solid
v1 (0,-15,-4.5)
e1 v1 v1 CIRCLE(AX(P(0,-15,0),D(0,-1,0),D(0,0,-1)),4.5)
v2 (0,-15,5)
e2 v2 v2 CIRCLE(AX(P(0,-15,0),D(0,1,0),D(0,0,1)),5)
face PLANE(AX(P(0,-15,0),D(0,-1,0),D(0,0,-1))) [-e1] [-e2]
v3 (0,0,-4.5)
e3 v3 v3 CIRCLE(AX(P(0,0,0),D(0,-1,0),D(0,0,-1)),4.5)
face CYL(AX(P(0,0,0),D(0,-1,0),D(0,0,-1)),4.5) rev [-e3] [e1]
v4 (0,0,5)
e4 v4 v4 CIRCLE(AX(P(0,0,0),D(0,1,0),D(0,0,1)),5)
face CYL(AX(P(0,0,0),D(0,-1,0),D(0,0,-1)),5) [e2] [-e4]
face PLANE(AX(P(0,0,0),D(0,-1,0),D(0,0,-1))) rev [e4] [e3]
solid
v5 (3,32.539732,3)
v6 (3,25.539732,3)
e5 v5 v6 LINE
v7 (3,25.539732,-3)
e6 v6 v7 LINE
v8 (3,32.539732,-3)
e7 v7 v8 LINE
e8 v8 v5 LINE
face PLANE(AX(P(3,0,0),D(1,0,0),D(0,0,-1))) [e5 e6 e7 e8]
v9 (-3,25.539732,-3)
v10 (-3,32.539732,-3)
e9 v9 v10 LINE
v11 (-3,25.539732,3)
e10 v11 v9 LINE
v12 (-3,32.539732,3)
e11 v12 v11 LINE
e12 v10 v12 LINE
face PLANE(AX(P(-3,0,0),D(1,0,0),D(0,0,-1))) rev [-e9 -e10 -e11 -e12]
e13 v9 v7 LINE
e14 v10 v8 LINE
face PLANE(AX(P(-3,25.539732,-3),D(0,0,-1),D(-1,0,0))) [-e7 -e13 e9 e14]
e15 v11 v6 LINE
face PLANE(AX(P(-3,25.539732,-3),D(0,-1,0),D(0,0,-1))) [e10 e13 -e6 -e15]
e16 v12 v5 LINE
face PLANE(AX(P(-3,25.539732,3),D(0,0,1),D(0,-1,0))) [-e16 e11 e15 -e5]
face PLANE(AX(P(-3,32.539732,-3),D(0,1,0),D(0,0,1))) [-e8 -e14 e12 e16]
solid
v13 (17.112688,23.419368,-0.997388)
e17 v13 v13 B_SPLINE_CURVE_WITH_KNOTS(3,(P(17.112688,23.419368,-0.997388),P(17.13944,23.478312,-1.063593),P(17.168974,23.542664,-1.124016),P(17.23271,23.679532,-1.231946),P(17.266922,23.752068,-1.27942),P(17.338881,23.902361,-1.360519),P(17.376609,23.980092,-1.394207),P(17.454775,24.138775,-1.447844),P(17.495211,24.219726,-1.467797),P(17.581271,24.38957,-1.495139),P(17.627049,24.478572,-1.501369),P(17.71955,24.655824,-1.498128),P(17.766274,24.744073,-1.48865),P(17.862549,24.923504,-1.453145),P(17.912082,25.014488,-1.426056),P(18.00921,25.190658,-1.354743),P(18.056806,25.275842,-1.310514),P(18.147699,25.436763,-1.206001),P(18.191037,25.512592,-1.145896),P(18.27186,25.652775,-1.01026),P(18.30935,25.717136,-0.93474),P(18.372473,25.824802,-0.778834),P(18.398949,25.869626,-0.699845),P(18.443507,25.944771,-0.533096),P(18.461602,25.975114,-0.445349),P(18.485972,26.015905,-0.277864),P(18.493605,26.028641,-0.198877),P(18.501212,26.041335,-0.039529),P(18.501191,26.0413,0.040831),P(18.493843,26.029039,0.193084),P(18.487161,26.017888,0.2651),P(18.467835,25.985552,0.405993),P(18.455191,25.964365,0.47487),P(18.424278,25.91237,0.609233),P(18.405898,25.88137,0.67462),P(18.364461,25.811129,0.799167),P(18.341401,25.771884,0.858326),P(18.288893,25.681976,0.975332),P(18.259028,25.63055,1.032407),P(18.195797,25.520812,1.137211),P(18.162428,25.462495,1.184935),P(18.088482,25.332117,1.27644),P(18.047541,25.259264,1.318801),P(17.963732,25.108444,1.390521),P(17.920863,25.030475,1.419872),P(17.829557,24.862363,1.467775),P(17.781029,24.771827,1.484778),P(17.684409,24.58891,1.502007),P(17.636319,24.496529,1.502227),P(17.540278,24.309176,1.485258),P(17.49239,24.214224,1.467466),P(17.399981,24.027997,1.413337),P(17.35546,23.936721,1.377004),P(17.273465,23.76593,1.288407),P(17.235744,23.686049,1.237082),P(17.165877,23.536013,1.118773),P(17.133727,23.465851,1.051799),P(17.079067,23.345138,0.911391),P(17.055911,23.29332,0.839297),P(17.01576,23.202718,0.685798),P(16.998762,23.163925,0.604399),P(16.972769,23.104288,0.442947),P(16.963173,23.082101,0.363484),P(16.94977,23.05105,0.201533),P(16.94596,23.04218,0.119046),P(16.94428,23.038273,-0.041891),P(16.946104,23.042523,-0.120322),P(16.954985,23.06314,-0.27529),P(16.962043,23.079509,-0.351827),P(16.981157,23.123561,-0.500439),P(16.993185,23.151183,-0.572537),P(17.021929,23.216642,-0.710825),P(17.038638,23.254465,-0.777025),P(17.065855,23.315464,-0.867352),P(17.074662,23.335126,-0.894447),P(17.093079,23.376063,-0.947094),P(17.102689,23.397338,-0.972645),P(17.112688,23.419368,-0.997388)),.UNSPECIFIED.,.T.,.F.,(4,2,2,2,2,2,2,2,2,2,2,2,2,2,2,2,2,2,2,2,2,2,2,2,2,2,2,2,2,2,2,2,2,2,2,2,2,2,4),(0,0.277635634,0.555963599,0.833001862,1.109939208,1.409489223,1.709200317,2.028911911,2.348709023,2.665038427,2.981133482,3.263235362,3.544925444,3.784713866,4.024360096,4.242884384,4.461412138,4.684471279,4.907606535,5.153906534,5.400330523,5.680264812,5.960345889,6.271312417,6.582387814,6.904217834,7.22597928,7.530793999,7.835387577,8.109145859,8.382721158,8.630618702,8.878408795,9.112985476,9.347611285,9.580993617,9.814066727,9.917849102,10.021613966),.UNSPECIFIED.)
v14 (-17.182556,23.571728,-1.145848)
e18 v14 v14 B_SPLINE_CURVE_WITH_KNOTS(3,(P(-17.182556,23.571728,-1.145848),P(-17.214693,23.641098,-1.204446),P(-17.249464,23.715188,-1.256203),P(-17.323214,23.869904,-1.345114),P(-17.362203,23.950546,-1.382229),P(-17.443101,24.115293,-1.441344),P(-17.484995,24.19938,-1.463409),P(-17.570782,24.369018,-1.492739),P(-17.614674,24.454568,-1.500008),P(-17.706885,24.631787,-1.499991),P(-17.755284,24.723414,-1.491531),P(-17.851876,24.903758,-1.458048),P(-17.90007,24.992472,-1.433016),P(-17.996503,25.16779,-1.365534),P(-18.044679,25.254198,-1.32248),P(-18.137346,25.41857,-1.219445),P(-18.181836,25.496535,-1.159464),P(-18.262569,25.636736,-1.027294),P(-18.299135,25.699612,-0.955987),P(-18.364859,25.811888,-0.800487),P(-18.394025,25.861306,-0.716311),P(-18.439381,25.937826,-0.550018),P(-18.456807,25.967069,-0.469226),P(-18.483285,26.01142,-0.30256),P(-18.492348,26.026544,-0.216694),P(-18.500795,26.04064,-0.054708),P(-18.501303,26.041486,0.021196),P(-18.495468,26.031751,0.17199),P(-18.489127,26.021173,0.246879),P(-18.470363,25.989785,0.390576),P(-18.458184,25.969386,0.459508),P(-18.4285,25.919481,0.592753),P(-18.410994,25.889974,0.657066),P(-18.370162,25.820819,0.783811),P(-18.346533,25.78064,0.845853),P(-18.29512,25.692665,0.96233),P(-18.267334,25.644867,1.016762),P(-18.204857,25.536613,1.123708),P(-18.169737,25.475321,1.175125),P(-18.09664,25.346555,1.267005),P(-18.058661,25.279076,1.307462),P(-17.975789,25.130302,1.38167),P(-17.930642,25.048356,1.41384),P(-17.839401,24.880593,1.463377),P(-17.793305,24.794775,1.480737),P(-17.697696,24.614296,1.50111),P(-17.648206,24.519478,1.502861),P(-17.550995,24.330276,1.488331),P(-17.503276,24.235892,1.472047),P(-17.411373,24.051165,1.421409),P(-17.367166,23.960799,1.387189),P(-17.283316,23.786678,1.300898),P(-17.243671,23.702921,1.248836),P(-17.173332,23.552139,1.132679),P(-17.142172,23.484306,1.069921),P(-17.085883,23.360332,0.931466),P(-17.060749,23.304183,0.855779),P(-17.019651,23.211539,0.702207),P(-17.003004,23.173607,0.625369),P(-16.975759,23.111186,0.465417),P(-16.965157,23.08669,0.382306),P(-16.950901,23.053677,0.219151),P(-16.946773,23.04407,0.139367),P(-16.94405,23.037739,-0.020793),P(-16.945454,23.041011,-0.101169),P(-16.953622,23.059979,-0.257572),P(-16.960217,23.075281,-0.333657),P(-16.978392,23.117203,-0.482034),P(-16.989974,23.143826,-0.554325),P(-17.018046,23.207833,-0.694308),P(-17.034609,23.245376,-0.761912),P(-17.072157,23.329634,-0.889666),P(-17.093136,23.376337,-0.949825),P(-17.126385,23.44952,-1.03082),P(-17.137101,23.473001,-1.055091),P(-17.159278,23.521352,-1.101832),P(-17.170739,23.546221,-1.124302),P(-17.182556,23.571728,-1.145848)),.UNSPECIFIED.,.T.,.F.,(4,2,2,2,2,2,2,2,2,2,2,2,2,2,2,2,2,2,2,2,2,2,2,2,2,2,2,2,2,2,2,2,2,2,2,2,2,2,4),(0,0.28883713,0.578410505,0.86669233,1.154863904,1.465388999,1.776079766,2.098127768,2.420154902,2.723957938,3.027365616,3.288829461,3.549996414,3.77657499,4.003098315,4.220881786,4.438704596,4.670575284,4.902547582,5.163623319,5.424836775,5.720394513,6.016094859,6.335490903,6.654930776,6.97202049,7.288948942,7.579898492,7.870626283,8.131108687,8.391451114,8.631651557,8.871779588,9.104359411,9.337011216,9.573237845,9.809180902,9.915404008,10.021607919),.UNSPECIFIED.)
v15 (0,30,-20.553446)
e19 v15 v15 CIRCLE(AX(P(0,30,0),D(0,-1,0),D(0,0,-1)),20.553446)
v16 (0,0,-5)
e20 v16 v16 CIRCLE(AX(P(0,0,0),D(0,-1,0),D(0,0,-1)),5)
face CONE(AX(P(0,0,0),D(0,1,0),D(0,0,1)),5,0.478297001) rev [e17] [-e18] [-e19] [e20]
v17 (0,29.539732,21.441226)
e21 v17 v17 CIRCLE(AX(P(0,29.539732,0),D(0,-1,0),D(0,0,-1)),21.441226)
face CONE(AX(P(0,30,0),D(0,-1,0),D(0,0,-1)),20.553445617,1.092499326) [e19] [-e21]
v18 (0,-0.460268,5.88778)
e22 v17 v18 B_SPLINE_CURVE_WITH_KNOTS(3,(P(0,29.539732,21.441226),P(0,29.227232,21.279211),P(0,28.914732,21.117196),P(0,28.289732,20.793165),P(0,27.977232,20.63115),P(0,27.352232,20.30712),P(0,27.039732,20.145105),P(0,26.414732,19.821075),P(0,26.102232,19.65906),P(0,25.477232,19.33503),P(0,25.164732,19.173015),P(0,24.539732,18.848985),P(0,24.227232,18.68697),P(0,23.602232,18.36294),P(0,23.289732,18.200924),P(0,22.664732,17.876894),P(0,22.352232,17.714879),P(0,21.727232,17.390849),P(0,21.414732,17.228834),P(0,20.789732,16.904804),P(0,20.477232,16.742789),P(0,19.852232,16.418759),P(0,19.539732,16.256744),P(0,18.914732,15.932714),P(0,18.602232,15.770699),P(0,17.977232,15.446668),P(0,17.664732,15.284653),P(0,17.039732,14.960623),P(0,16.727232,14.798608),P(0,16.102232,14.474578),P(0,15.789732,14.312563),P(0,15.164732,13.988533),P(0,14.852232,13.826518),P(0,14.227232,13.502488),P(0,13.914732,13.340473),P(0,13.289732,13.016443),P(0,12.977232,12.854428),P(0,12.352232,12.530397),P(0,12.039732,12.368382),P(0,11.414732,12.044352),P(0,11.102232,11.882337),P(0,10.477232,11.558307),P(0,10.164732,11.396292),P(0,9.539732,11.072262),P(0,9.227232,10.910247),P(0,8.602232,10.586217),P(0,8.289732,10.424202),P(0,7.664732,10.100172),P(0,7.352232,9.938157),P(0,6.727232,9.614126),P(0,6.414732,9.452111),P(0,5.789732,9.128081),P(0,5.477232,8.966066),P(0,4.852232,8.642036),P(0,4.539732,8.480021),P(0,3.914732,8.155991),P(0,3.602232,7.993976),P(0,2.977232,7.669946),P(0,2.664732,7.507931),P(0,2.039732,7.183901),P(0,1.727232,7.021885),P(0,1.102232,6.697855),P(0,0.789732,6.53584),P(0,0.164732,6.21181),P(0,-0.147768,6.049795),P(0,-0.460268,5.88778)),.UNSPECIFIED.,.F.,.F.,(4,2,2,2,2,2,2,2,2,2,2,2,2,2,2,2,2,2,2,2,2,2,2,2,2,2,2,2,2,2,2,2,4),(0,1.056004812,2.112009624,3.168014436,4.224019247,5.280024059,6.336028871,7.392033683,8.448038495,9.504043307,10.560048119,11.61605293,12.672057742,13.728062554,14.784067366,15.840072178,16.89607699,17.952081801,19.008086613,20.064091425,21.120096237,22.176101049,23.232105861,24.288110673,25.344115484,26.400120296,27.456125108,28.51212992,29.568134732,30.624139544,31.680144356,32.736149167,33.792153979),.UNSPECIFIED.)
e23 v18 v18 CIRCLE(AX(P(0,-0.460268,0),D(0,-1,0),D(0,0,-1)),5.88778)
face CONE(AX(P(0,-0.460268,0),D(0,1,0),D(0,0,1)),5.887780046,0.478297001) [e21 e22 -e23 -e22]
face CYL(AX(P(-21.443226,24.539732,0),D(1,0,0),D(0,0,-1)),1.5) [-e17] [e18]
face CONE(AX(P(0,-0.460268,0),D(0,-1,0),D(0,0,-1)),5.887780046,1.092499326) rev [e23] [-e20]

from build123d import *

# Parameters (mm, degrees)
BOSS_EXTRUDE1_REACH             = 44.655
SKETCH2_R                       = 1.5
BOSS_EXTRUDE1_DIRECTION_2_REACH = 44.655
BOSS_EXTRUDE2_DEPTH             = 3
BOSS_EXTRUDE2_DEPTH_BACK        = 3
SKETCH4_W                       = 6
SKETCH4_H                       = 7
BOSS_EXTRUDE3_START             = -15
BOSS_EXTRUDE3_OUTLINE_R         = 5
BOSS_EXTRUDE3_DEPTH             = 15
SKETCH5_R                       = 4.5
CUT_EXTRUDE1_DEPTH              = 15


# Read off the part's stored shape, not the designer's step: Boss-Extrude3
with BuildPart() as part:
    # Sketch1 → Revolve-Thin1 (revolve)
    with BuildSketch(Plane.XY, mode=Mode.PRIVATE) as revolve_thin1_sk:
        Polygon((5, 0), (20.553445617, 30), (21.441225663, 29.539732045), (5.887780046, -0.460267955), align=None)
    revolve(revolve_thin1_sk.sketch.rotate(Axis((0, 0, 0), (0, 1, 0)), 270), axis=Axis((0, 0, 0), (0, 1, 0)))

    # Boss-Extrude1: up to this cone (the profile starts inside it)
    boss_extrude1_end = Plane(origin=(0, 24.539732, 0), z_dir=(0, 1, 0)).offset(-34.183896267) * Cone(1e-06, 50.321346716, 97.061475837, align=(Align.CENTER, Align.CENTER, Align.MIN), mode=Mode.PRIVATE)
    # Sketch2 → Boss-Extrude1 (add, up to the surface)
    with BuildSketch(Plane(origin=(0, 0, 0), x_dir=(0, 0, -1), z_dir=(1, 0, 0)), mode=Mode.PRIVATE) as boss_extrude1_sk1:
        with Locations(Location((0, 24.539732045, 0), (0, 0, 319.809135036))):
            Circle(SKETCH2_R)
    boss_extrude1_tool1 = extrude(boss_extrude1_sk1.sketch, amount=BOSS_EXTRUDE1_REACH, mode=Mode.PRIVATE) & boss_extrude1_end
    add(boss_extrude1_tool1.solids().sort_by_distance((0, 24.539732, 0))[0])

    # Boss-Extrude1 direction 2: up to this cone (the profile starts inside it)
    boss_extrude1_direction_2_end = Plane(origin=(0, 24.539732, 0), z_dir=(0, 1, 0)).offset(-34.183896267) * Cone(1e-06, 50.321346716, 97.061475837, align=(Align.CENTER, Align.CENTER, Align.MIN), mode=Mode.PRIVATE)
    # Sketch2 → Boss-Extrude1 direction 2 (add, up to the surface)
    with BuildSketch(Plane(origin=(0, 0, 0), x_dir=(0, 0, -1), z_dir=(1, 0, 0)), mode=Mode.PRIVATE) as boss_extrude1_direction_2_sk1:
        with Locations(Location((0, 24.539732045, 0), (0, 0, 319.809135036))):
            Circle(SKETCH2_R)
    boss_extrude1_direction_2_tool1 = extrude(boss_extrude1_direction_2_sk1.sketch, amount=-BOSS_EXTRUDE1_DIRECTION_2_REACH, mode=Mode.PRIVATE) & boss_extrude1_direction_2_end
    add(boss_extrude1_direction_2_tool1.solids().sort_by_distance((0, 24.539732, 0))[0])


with BuildPart() as body_2:
    # Sketch4 → Boss-Extrude2 (new, two sides: drawn at the far end of the back side and taken through both)
    with BuildSketch(Plane(origin=(0, 0, 0), x_dir=(0, 0, -1), z_dir=(1, 0, 0)).offset(-BOSS_EXTRUDE2_DEPTH_BACK)):
        with Locations((0, 29.039732045)):
            Rectangle(SKETCH4_W, SKETCH4_H)
    extrude(amount=BOSS_EXTRUDE2_DEPTH + BOSS_EXTRUDE2_DEPTH_BACK)


with BuildPart() as body_3:
    # Boss-Extrude3 outline → Boss-Extrude3 (new body)
    with BuildSketch(Plane(origin=(0, 0, 0), x_dir=(1, 0, 0), z_dir=(0, 1, 0)).offset(BOSS_EXTRUDE3_START)):
        Circle(BOSS_EXTRUDE3_OUTLINE_R)
    extrude(amount=BOSS_EXTRUDE3_DEPTH)

    # Sketch5 → Cut-Extrude1 (cut)
    with BuildSketch(Plane.XZ.offset(15)):
        with Locations(Location((0, 0, 0), (0, 0, 270))):
            Circle(SKETCH5_R)
    extrude(amount=-CUT_EXTRUDE1_DEPTH, mode=Mode.SUBTRACT)


solid = Compound([part.part, body_2.part, body_3.part])
